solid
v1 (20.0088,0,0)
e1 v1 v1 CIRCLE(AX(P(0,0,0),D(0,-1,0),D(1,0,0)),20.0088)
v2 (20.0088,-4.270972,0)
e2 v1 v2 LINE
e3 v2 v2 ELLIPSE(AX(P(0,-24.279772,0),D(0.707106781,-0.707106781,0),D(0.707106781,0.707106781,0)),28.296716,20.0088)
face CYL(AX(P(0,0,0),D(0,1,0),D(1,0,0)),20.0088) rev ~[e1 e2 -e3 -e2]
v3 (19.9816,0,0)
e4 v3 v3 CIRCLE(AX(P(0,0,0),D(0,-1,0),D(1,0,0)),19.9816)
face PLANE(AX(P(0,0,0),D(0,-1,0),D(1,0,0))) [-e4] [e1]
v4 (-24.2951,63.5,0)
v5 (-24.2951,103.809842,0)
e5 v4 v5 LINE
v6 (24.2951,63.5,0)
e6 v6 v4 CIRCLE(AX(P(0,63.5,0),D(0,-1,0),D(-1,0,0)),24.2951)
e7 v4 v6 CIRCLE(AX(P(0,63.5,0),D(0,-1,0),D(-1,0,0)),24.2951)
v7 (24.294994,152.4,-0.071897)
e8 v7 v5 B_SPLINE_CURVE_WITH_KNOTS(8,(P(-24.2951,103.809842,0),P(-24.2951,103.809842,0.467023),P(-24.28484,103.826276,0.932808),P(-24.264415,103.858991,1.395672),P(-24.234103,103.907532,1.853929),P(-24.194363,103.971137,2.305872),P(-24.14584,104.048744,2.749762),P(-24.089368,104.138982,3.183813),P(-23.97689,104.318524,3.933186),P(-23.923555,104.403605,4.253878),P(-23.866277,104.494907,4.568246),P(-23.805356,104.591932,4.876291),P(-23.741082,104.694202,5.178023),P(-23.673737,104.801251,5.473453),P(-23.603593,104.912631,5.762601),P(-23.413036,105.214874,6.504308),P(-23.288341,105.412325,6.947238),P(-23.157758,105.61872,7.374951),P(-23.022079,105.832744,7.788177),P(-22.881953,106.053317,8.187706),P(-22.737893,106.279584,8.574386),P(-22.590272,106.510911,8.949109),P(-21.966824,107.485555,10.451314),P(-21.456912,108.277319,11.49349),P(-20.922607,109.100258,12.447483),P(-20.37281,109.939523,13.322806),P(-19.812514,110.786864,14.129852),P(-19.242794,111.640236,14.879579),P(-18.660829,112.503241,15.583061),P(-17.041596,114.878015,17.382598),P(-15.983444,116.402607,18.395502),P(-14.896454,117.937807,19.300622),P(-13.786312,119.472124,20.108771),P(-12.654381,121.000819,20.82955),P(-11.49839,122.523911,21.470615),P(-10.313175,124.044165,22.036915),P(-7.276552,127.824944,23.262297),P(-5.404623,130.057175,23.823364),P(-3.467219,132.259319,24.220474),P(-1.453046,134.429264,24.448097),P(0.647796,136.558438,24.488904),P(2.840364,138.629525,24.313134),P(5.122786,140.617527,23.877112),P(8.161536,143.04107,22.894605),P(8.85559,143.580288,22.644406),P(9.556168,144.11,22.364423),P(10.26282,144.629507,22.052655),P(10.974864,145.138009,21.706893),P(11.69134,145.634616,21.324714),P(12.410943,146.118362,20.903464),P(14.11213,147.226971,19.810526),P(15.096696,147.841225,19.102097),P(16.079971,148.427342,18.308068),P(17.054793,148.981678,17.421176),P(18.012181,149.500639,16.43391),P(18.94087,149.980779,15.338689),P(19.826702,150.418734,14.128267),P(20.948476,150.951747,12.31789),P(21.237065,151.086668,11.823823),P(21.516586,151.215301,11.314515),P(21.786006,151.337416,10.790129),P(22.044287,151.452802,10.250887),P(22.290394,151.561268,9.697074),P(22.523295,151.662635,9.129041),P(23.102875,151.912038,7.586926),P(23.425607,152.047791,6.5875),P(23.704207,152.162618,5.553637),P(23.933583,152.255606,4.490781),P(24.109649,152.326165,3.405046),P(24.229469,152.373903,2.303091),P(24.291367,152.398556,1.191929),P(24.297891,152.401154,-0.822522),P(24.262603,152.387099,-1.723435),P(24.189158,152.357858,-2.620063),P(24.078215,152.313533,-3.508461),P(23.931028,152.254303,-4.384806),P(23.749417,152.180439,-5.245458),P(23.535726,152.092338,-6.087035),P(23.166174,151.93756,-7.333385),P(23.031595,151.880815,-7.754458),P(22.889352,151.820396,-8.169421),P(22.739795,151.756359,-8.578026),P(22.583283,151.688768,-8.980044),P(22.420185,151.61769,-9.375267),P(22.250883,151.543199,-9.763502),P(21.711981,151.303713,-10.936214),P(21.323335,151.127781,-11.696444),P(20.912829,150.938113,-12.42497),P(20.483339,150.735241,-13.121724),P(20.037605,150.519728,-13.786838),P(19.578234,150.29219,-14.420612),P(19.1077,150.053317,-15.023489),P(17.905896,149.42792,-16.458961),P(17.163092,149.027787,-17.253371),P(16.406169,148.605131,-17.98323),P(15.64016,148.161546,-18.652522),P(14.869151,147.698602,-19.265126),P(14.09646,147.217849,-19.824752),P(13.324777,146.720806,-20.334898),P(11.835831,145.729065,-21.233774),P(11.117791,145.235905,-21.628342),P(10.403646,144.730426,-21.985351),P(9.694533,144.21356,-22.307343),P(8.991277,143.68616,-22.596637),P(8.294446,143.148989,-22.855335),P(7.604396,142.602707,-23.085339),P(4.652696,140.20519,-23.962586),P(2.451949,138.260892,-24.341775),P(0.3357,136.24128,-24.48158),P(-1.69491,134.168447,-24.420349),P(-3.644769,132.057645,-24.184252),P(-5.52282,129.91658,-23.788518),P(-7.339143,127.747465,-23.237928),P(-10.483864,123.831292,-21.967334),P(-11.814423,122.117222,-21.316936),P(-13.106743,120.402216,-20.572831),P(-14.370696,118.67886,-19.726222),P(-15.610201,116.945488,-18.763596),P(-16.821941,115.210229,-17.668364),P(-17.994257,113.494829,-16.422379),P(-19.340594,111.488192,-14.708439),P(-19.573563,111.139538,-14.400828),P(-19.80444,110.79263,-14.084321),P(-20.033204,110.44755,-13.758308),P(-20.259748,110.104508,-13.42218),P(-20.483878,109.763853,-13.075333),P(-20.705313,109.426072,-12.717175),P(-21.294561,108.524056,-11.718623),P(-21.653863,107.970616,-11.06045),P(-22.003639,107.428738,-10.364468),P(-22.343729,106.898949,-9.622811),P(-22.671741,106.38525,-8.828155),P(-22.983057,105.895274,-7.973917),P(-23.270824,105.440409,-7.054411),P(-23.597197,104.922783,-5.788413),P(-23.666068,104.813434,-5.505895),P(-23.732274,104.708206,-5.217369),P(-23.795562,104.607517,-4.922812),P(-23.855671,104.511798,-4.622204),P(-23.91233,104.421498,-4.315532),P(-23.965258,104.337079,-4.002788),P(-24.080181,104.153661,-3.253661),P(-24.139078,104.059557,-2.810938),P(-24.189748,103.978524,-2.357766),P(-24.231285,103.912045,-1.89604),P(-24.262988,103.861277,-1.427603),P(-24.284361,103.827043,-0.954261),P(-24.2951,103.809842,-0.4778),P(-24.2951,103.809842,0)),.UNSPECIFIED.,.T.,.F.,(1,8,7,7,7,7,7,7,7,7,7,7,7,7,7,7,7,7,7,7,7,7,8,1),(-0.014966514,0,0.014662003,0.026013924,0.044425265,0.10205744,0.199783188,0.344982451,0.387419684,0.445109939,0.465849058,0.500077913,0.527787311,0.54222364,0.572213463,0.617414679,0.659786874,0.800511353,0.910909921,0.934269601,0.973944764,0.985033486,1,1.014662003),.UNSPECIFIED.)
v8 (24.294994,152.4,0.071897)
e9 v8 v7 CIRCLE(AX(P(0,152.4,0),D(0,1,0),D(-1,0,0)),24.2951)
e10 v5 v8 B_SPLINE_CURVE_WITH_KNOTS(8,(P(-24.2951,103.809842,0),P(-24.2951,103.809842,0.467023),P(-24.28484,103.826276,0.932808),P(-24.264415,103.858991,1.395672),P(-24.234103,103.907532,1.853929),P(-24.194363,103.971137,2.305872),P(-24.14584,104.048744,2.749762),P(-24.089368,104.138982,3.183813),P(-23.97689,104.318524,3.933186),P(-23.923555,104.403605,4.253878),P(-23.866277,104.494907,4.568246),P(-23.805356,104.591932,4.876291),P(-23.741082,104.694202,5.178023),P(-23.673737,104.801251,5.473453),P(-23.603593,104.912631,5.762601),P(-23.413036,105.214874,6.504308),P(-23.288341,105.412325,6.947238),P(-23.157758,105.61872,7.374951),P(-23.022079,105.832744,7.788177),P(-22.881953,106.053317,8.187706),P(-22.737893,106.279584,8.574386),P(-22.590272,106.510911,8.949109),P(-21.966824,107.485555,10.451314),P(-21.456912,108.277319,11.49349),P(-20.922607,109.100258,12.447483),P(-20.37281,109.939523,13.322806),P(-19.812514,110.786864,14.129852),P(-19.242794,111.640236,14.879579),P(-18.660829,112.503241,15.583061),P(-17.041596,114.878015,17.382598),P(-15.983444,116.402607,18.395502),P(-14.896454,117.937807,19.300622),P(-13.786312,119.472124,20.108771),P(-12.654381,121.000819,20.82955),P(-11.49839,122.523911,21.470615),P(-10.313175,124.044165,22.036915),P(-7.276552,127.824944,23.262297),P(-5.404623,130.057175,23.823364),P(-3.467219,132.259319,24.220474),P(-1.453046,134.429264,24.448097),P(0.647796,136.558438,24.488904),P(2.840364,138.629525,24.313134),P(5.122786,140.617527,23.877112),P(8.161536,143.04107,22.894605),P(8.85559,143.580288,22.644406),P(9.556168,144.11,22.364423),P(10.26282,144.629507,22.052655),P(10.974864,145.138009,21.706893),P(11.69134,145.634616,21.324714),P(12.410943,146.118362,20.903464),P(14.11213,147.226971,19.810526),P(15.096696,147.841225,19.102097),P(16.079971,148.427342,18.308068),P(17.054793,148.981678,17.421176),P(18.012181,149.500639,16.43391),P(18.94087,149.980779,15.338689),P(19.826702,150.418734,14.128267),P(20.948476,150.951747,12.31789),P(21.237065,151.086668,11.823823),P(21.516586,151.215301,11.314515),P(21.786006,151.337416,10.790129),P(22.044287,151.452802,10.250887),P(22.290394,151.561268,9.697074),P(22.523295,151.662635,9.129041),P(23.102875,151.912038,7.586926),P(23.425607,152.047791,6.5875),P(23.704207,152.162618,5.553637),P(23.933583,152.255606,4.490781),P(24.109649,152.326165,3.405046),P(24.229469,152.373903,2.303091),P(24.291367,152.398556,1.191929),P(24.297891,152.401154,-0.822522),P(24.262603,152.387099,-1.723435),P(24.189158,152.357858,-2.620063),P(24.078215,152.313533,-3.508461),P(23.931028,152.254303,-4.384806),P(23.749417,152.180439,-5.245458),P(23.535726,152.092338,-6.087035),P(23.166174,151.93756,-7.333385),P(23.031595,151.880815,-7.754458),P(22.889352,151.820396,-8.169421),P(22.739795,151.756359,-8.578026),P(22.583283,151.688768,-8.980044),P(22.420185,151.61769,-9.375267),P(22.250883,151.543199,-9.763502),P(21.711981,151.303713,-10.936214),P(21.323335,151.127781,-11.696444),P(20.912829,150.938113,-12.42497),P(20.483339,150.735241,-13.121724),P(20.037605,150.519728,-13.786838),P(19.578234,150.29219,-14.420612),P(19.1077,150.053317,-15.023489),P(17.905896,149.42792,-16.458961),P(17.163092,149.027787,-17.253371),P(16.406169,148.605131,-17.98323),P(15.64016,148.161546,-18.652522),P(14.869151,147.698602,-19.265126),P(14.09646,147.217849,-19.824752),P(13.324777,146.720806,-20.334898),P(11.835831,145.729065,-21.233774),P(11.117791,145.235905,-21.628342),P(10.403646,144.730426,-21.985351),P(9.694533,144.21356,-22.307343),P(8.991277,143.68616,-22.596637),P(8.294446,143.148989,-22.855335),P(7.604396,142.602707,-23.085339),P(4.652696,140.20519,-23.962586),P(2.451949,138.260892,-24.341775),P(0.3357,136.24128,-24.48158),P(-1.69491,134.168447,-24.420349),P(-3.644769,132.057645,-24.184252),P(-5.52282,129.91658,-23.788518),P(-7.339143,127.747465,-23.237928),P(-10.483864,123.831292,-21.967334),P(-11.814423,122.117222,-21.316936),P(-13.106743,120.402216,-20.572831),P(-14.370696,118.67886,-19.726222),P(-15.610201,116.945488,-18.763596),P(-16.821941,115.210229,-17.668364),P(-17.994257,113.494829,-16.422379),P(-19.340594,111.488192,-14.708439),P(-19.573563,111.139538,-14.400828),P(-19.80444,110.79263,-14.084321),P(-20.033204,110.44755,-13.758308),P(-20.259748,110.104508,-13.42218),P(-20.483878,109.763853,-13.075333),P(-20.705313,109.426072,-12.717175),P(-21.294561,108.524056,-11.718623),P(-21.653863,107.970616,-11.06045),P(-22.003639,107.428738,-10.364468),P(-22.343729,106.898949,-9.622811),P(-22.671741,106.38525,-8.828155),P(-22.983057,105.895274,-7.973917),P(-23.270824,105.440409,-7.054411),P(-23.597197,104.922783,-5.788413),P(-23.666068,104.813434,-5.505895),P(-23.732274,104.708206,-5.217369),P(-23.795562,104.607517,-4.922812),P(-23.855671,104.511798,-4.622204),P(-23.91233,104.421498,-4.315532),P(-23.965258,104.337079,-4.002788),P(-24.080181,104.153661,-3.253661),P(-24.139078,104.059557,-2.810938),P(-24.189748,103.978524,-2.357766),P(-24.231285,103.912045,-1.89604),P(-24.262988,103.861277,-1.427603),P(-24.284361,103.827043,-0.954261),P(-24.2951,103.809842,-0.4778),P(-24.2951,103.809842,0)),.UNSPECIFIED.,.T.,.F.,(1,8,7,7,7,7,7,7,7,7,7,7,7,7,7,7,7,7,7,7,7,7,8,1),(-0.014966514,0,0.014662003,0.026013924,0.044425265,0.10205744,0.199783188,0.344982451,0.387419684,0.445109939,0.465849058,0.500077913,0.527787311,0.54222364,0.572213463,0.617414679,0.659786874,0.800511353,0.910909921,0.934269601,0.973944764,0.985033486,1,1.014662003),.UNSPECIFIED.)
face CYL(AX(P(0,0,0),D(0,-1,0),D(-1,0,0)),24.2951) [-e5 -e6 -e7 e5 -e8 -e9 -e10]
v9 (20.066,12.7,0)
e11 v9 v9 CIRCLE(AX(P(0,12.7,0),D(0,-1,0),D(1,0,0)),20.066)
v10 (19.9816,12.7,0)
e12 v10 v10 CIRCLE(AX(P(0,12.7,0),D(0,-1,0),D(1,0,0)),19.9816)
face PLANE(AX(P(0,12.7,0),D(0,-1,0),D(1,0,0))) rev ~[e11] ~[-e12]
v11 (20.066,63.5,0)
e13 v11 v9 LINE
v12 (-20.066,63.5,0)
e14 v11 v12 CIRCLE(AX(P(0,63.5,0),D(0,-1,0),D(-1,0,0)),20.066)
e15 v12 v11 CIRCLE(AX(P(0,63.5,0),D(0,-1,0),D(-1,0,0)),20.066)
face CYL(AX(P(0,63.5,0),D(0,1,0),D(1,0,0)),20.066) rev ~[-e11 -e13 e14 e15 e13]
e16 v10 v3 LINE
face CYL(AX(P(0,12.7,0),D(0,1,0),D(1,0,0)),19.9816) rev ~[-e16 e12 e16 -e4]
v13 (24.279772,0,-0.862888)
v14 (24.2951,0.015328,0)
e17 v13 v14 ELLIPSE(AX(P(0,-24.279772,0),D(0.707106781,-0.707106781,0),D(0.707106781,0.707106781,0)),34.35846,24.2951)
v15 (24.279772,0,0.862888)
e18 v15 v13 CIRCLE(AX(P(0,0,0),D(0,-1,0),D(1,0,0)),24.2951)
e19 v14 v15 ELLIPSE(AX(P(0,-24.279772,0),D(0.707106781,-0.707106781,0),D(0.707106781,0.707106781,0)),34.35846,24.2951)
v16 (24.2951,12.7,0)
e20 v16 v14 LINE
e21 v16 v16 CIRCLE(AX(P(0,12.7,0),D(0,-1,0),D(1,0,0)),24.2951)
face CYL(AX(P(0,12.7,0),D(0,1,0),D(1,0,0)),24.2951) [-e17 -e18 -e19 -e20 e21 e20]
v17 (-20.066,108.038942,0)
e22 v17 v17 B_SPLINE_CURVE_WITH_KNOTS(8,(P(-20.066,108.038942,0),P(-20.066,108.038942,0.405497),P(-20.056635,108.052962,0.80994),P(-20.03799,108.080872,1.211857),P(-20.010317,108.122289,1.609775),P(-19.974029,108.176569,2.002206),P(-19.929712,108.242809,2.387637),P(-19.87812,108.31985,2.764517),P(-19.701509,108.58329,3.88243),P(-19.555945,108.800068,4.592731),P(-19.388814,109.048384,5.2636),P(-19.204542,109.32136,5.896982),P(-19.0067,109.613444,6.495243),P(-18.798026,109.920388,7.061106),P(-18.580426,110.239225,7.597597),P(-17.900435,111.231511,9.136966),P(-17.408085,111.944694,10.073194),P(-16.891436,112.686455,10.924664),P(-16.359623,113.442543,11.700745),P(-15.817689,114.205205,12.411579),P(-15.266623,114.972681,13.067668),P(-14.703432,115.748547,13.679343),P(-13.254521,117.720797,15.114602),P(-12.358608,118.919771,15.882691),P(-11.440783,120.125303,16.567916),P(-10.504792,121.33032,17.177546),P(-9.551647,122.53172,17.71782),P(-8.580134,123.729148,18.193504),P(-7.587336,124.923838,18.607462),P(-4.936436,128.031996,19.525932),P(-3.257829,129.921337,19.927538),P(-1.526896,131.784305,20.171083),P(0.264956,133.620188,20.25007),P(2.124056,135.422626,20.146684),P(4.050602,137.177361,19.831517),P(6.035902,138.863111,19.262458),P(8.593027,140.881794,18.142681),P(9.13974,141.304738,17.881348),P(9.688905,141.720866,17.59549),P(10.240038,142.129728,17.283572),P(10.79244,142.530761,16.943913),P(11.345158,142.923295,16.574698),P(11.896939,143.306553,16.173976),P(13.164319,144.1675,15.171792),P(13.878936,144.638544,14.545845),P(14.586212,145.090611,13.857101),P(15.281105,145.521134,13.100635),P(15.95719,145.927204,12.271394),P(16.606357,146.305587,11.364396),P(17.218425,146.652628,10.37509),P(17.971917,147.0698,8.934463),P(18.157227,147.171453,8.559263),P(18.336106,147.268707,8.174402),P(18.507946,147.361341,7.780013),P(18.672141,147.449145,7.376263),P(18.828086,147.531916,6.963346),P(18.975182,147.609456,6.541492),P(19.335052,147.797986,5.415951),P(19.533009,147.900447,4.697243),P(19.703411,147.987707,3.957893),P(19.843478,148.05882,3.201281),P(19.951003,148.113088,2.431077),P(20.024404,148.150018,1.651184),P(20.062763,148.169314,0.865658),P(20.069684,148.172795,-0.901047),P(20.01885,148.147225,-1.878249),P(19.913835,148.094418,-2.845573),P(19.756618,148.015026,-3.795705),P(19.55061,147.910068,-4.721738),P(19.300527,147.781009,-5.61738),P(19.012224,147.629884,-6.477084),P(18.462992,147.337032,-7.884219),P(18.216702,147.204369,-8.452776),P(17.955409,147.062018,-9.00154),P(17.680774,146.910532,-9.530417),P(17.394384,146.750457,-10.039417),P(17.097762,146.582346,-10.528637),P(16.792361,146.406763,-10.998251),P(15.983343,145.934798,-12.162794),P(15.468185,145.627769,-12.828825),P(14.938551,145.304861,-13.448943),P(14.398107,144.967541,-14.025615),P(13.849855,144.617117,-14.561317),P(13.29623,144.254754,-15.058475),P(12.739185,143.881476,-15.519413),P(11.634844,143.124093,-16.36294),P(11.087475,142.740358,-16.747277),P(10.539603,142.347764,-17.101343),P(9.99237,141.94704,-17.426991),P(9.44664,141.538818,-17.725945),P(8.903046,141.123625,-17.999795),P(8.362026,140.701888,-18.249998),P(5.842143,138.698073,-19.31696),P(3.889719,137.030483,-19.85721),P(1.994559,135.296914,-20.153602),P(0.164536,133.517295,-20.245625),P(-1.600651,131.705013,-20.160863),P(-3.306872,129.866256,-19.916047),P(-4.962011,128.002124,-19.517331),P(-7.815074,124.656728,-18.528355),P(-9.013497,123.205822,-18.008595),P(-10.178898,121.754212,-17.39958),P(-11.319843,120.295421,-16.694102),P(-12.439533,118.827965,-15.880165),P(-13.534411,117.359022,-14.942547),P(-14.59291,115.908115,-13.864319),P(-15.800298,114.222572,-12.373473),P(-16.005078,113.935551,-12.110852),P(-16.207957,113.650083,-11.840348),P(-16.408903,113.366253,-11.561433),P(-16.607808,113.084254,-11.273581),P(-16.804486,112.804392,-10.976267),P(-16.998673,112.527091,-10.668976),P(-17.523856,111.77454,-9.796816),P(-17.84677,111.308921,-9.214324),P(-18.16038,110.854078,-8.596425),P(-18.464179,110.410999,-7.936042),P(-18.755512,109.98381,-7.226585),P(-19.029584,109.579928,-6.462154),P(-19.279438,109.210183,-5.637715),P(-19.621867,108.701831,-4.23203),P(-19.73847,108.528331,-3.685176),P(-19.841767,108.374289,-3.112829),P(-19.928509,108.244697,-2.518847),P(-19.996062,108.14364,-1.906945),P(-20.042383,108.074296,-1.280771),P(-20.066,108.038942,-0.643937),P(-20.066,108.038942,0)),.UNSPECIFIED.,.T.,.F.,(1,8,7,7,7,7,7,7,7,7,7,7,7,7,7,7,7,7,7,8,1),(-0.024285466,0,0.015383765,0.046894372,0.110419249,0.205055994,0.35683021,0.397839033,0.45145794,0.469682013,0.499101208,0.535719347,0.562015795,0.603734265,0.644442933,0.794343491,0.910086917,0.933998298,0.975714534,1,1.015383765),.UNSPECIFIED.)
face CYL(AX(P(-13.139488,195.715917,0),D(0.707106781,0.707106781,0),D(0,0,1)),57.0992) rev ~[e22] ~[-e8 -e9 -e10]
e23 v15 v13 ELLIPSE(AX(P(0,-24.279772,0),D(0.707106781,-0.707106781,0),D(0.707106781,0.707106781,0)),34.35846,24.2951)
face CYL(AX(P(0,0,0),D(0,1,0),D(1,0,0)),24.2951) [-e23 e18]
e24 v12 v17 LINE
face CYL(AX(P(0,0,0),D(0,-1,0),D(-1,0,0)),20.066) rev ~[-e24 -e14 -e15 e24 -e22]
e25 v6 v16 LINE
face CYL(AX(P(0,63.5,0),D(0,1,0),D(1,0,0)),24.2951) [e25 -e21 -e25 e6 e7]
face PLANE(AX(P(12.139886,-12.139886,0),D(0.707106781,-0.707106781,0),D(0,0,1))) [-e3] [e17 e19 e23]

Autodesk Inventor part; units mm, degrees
sketch "Sketch1" plane through (0, 0, 0) normal (0, 1, 0) x (-1, 0, 0)
  circle A0 centre (0, 0) radius 20.066
  circle A1 centre (0, 0) radius 24.2951
  dimension "d0" = 40.132
  dimension "d1" = 48.5902
extrude "Extrusion1" add sketch "Sketch1" along normal blind 152.4
ref_plane "Work Plane4" through (15.0868, 167.4868, 0) normal (0.7071068, 0.7071068, 0) x (0, 0, -1)
ref_plane "Work Plane3" through (0, 152.4, 0) normal (0.7071068, 0.7071068, 0) x (0, 0, -1)
sketch "Sketch2" plane through (15.0868, 167.4868, 0) normal (0.7071068, 0.7071068, 0) x (0, 0, -1)
  ellipse E0 centre (0, 0) end of major axis (24.2951, 0) minor radius 17.1792 projected
  line L0 (0, -17.1792) -> (46.559, -17.1792)
  line L1 (0, -17.1792) -> (-63.5901, -17.1792)
  line L2 (0, -17.1792) -> (0, 39.92)
  line L3 (0, 39.92) -> (57.0992, 39.92)
  arc A0 (-57.0992, 39.92) -> (57.0992, 39.92) centre (0, 39.92) ccw
  line L4 (57.0992, 39.92) -> (-57.0992, 39.92)
  point P0 (0, -107.7631)
  dimension "d6" = 57.0992
  dimension "d7" = 57.0992
  dimension "d8" = 114.1984
extrude "Extrusion2" cut sketch "Sketch2" against normal blind 152.4
sketch "Sketch3" plane through (0, 0, 0) normal (0, -1, 0) x (1, 0, 0)
  circle A0 centre (0, 0) radius 77.6216
extrude "Extrusion3" cut sketch "Sketch3" against normal blind 63.5
sketch "Sketch4" plane through (0, 63.5, 0) normal (0, -1, 0) x (1, 0, 0)
  circle A0 centre (0, 0) radius 20.066
  circle A1 centre (0, 0) radius 24.2951
extrude "Extrusion4" add sketch "Sketch4" along normal blind 50.8
sketch "Sketch5" plane through (0, 12.7, 0) normal (0, -1, 0) x (1, 0, 0)
  circle A0 centre (0, 0) radius 19.9816
  circle A1 centre (0, 0) radius 24.2951
extrude "Extrusion5" add sketch "Sketch5" along normal blind 12.7
ref_plane "Work Plane5" through (0, 0, 0) normal (-0.7071068, -0.7071068, 0) x (0, 0, -1)
ref_plane "Work Plane6" through (0, 0, 0) normal (-0.7071068, -0.7071068, 0) x (0, 0, -1)
ref_plane "Work Plane9" through (12.1413, -12.1413, 0) normal (0.7071068, -0.7071068, 0) x (0, 0, 1)
ref_plane "Work Plane8" through (-12.1413, 12.1413, 0) normal (0.7071068, -0.7071068, 0) x (0, 0, 1)
sketch "Sketch6" plane through (0, 0, 0) normal (0, -1, 0) x (1, 0, 0)
  circle A0 centre (0, 0) radius 20.0088
  circle A1 centre (0, 0) radius 24.2951
extrude "Extrusion6" add sketch "Sketch6" along normal blind 50.8
sketch "Sketch7" plane through (12.1413, -12.1413, 0) normal (0.7071068, -0.7071068, 0) x (0, 0, 1)
  line L0 (26.0117, 61.2493) -> (-25.7555, 61.2493)
  line L1 (-25.7555, 61.2493) -> (-25.7555, -22.8083)
  line L2 (-25.7555, -22.8083) -> (26.0117, -22.8083)
  line L3 (26.0117, -22.8083) -> (26.0117, 61.2493)
  point P0 (0, 0)
extrude "Extrusion7" cut sketch "Sketch7" along normal blind 50.8
ref_plane "Work Plane1" through (0, 76.2, 0) normal (0, 1, 0) x (1, 0, 0)
ref_plane "Work Plane2" through (0, 152.4, 0) normal (0, 1, 0) x (1, 0, 0)
ref_plane "Work Plane7" through (0, 0, 0) normal (0.7071068, -0.7071068, 0) x (0, 0, 1)
properties part number "Angled Pipe (Attached to Control Pipe)"
